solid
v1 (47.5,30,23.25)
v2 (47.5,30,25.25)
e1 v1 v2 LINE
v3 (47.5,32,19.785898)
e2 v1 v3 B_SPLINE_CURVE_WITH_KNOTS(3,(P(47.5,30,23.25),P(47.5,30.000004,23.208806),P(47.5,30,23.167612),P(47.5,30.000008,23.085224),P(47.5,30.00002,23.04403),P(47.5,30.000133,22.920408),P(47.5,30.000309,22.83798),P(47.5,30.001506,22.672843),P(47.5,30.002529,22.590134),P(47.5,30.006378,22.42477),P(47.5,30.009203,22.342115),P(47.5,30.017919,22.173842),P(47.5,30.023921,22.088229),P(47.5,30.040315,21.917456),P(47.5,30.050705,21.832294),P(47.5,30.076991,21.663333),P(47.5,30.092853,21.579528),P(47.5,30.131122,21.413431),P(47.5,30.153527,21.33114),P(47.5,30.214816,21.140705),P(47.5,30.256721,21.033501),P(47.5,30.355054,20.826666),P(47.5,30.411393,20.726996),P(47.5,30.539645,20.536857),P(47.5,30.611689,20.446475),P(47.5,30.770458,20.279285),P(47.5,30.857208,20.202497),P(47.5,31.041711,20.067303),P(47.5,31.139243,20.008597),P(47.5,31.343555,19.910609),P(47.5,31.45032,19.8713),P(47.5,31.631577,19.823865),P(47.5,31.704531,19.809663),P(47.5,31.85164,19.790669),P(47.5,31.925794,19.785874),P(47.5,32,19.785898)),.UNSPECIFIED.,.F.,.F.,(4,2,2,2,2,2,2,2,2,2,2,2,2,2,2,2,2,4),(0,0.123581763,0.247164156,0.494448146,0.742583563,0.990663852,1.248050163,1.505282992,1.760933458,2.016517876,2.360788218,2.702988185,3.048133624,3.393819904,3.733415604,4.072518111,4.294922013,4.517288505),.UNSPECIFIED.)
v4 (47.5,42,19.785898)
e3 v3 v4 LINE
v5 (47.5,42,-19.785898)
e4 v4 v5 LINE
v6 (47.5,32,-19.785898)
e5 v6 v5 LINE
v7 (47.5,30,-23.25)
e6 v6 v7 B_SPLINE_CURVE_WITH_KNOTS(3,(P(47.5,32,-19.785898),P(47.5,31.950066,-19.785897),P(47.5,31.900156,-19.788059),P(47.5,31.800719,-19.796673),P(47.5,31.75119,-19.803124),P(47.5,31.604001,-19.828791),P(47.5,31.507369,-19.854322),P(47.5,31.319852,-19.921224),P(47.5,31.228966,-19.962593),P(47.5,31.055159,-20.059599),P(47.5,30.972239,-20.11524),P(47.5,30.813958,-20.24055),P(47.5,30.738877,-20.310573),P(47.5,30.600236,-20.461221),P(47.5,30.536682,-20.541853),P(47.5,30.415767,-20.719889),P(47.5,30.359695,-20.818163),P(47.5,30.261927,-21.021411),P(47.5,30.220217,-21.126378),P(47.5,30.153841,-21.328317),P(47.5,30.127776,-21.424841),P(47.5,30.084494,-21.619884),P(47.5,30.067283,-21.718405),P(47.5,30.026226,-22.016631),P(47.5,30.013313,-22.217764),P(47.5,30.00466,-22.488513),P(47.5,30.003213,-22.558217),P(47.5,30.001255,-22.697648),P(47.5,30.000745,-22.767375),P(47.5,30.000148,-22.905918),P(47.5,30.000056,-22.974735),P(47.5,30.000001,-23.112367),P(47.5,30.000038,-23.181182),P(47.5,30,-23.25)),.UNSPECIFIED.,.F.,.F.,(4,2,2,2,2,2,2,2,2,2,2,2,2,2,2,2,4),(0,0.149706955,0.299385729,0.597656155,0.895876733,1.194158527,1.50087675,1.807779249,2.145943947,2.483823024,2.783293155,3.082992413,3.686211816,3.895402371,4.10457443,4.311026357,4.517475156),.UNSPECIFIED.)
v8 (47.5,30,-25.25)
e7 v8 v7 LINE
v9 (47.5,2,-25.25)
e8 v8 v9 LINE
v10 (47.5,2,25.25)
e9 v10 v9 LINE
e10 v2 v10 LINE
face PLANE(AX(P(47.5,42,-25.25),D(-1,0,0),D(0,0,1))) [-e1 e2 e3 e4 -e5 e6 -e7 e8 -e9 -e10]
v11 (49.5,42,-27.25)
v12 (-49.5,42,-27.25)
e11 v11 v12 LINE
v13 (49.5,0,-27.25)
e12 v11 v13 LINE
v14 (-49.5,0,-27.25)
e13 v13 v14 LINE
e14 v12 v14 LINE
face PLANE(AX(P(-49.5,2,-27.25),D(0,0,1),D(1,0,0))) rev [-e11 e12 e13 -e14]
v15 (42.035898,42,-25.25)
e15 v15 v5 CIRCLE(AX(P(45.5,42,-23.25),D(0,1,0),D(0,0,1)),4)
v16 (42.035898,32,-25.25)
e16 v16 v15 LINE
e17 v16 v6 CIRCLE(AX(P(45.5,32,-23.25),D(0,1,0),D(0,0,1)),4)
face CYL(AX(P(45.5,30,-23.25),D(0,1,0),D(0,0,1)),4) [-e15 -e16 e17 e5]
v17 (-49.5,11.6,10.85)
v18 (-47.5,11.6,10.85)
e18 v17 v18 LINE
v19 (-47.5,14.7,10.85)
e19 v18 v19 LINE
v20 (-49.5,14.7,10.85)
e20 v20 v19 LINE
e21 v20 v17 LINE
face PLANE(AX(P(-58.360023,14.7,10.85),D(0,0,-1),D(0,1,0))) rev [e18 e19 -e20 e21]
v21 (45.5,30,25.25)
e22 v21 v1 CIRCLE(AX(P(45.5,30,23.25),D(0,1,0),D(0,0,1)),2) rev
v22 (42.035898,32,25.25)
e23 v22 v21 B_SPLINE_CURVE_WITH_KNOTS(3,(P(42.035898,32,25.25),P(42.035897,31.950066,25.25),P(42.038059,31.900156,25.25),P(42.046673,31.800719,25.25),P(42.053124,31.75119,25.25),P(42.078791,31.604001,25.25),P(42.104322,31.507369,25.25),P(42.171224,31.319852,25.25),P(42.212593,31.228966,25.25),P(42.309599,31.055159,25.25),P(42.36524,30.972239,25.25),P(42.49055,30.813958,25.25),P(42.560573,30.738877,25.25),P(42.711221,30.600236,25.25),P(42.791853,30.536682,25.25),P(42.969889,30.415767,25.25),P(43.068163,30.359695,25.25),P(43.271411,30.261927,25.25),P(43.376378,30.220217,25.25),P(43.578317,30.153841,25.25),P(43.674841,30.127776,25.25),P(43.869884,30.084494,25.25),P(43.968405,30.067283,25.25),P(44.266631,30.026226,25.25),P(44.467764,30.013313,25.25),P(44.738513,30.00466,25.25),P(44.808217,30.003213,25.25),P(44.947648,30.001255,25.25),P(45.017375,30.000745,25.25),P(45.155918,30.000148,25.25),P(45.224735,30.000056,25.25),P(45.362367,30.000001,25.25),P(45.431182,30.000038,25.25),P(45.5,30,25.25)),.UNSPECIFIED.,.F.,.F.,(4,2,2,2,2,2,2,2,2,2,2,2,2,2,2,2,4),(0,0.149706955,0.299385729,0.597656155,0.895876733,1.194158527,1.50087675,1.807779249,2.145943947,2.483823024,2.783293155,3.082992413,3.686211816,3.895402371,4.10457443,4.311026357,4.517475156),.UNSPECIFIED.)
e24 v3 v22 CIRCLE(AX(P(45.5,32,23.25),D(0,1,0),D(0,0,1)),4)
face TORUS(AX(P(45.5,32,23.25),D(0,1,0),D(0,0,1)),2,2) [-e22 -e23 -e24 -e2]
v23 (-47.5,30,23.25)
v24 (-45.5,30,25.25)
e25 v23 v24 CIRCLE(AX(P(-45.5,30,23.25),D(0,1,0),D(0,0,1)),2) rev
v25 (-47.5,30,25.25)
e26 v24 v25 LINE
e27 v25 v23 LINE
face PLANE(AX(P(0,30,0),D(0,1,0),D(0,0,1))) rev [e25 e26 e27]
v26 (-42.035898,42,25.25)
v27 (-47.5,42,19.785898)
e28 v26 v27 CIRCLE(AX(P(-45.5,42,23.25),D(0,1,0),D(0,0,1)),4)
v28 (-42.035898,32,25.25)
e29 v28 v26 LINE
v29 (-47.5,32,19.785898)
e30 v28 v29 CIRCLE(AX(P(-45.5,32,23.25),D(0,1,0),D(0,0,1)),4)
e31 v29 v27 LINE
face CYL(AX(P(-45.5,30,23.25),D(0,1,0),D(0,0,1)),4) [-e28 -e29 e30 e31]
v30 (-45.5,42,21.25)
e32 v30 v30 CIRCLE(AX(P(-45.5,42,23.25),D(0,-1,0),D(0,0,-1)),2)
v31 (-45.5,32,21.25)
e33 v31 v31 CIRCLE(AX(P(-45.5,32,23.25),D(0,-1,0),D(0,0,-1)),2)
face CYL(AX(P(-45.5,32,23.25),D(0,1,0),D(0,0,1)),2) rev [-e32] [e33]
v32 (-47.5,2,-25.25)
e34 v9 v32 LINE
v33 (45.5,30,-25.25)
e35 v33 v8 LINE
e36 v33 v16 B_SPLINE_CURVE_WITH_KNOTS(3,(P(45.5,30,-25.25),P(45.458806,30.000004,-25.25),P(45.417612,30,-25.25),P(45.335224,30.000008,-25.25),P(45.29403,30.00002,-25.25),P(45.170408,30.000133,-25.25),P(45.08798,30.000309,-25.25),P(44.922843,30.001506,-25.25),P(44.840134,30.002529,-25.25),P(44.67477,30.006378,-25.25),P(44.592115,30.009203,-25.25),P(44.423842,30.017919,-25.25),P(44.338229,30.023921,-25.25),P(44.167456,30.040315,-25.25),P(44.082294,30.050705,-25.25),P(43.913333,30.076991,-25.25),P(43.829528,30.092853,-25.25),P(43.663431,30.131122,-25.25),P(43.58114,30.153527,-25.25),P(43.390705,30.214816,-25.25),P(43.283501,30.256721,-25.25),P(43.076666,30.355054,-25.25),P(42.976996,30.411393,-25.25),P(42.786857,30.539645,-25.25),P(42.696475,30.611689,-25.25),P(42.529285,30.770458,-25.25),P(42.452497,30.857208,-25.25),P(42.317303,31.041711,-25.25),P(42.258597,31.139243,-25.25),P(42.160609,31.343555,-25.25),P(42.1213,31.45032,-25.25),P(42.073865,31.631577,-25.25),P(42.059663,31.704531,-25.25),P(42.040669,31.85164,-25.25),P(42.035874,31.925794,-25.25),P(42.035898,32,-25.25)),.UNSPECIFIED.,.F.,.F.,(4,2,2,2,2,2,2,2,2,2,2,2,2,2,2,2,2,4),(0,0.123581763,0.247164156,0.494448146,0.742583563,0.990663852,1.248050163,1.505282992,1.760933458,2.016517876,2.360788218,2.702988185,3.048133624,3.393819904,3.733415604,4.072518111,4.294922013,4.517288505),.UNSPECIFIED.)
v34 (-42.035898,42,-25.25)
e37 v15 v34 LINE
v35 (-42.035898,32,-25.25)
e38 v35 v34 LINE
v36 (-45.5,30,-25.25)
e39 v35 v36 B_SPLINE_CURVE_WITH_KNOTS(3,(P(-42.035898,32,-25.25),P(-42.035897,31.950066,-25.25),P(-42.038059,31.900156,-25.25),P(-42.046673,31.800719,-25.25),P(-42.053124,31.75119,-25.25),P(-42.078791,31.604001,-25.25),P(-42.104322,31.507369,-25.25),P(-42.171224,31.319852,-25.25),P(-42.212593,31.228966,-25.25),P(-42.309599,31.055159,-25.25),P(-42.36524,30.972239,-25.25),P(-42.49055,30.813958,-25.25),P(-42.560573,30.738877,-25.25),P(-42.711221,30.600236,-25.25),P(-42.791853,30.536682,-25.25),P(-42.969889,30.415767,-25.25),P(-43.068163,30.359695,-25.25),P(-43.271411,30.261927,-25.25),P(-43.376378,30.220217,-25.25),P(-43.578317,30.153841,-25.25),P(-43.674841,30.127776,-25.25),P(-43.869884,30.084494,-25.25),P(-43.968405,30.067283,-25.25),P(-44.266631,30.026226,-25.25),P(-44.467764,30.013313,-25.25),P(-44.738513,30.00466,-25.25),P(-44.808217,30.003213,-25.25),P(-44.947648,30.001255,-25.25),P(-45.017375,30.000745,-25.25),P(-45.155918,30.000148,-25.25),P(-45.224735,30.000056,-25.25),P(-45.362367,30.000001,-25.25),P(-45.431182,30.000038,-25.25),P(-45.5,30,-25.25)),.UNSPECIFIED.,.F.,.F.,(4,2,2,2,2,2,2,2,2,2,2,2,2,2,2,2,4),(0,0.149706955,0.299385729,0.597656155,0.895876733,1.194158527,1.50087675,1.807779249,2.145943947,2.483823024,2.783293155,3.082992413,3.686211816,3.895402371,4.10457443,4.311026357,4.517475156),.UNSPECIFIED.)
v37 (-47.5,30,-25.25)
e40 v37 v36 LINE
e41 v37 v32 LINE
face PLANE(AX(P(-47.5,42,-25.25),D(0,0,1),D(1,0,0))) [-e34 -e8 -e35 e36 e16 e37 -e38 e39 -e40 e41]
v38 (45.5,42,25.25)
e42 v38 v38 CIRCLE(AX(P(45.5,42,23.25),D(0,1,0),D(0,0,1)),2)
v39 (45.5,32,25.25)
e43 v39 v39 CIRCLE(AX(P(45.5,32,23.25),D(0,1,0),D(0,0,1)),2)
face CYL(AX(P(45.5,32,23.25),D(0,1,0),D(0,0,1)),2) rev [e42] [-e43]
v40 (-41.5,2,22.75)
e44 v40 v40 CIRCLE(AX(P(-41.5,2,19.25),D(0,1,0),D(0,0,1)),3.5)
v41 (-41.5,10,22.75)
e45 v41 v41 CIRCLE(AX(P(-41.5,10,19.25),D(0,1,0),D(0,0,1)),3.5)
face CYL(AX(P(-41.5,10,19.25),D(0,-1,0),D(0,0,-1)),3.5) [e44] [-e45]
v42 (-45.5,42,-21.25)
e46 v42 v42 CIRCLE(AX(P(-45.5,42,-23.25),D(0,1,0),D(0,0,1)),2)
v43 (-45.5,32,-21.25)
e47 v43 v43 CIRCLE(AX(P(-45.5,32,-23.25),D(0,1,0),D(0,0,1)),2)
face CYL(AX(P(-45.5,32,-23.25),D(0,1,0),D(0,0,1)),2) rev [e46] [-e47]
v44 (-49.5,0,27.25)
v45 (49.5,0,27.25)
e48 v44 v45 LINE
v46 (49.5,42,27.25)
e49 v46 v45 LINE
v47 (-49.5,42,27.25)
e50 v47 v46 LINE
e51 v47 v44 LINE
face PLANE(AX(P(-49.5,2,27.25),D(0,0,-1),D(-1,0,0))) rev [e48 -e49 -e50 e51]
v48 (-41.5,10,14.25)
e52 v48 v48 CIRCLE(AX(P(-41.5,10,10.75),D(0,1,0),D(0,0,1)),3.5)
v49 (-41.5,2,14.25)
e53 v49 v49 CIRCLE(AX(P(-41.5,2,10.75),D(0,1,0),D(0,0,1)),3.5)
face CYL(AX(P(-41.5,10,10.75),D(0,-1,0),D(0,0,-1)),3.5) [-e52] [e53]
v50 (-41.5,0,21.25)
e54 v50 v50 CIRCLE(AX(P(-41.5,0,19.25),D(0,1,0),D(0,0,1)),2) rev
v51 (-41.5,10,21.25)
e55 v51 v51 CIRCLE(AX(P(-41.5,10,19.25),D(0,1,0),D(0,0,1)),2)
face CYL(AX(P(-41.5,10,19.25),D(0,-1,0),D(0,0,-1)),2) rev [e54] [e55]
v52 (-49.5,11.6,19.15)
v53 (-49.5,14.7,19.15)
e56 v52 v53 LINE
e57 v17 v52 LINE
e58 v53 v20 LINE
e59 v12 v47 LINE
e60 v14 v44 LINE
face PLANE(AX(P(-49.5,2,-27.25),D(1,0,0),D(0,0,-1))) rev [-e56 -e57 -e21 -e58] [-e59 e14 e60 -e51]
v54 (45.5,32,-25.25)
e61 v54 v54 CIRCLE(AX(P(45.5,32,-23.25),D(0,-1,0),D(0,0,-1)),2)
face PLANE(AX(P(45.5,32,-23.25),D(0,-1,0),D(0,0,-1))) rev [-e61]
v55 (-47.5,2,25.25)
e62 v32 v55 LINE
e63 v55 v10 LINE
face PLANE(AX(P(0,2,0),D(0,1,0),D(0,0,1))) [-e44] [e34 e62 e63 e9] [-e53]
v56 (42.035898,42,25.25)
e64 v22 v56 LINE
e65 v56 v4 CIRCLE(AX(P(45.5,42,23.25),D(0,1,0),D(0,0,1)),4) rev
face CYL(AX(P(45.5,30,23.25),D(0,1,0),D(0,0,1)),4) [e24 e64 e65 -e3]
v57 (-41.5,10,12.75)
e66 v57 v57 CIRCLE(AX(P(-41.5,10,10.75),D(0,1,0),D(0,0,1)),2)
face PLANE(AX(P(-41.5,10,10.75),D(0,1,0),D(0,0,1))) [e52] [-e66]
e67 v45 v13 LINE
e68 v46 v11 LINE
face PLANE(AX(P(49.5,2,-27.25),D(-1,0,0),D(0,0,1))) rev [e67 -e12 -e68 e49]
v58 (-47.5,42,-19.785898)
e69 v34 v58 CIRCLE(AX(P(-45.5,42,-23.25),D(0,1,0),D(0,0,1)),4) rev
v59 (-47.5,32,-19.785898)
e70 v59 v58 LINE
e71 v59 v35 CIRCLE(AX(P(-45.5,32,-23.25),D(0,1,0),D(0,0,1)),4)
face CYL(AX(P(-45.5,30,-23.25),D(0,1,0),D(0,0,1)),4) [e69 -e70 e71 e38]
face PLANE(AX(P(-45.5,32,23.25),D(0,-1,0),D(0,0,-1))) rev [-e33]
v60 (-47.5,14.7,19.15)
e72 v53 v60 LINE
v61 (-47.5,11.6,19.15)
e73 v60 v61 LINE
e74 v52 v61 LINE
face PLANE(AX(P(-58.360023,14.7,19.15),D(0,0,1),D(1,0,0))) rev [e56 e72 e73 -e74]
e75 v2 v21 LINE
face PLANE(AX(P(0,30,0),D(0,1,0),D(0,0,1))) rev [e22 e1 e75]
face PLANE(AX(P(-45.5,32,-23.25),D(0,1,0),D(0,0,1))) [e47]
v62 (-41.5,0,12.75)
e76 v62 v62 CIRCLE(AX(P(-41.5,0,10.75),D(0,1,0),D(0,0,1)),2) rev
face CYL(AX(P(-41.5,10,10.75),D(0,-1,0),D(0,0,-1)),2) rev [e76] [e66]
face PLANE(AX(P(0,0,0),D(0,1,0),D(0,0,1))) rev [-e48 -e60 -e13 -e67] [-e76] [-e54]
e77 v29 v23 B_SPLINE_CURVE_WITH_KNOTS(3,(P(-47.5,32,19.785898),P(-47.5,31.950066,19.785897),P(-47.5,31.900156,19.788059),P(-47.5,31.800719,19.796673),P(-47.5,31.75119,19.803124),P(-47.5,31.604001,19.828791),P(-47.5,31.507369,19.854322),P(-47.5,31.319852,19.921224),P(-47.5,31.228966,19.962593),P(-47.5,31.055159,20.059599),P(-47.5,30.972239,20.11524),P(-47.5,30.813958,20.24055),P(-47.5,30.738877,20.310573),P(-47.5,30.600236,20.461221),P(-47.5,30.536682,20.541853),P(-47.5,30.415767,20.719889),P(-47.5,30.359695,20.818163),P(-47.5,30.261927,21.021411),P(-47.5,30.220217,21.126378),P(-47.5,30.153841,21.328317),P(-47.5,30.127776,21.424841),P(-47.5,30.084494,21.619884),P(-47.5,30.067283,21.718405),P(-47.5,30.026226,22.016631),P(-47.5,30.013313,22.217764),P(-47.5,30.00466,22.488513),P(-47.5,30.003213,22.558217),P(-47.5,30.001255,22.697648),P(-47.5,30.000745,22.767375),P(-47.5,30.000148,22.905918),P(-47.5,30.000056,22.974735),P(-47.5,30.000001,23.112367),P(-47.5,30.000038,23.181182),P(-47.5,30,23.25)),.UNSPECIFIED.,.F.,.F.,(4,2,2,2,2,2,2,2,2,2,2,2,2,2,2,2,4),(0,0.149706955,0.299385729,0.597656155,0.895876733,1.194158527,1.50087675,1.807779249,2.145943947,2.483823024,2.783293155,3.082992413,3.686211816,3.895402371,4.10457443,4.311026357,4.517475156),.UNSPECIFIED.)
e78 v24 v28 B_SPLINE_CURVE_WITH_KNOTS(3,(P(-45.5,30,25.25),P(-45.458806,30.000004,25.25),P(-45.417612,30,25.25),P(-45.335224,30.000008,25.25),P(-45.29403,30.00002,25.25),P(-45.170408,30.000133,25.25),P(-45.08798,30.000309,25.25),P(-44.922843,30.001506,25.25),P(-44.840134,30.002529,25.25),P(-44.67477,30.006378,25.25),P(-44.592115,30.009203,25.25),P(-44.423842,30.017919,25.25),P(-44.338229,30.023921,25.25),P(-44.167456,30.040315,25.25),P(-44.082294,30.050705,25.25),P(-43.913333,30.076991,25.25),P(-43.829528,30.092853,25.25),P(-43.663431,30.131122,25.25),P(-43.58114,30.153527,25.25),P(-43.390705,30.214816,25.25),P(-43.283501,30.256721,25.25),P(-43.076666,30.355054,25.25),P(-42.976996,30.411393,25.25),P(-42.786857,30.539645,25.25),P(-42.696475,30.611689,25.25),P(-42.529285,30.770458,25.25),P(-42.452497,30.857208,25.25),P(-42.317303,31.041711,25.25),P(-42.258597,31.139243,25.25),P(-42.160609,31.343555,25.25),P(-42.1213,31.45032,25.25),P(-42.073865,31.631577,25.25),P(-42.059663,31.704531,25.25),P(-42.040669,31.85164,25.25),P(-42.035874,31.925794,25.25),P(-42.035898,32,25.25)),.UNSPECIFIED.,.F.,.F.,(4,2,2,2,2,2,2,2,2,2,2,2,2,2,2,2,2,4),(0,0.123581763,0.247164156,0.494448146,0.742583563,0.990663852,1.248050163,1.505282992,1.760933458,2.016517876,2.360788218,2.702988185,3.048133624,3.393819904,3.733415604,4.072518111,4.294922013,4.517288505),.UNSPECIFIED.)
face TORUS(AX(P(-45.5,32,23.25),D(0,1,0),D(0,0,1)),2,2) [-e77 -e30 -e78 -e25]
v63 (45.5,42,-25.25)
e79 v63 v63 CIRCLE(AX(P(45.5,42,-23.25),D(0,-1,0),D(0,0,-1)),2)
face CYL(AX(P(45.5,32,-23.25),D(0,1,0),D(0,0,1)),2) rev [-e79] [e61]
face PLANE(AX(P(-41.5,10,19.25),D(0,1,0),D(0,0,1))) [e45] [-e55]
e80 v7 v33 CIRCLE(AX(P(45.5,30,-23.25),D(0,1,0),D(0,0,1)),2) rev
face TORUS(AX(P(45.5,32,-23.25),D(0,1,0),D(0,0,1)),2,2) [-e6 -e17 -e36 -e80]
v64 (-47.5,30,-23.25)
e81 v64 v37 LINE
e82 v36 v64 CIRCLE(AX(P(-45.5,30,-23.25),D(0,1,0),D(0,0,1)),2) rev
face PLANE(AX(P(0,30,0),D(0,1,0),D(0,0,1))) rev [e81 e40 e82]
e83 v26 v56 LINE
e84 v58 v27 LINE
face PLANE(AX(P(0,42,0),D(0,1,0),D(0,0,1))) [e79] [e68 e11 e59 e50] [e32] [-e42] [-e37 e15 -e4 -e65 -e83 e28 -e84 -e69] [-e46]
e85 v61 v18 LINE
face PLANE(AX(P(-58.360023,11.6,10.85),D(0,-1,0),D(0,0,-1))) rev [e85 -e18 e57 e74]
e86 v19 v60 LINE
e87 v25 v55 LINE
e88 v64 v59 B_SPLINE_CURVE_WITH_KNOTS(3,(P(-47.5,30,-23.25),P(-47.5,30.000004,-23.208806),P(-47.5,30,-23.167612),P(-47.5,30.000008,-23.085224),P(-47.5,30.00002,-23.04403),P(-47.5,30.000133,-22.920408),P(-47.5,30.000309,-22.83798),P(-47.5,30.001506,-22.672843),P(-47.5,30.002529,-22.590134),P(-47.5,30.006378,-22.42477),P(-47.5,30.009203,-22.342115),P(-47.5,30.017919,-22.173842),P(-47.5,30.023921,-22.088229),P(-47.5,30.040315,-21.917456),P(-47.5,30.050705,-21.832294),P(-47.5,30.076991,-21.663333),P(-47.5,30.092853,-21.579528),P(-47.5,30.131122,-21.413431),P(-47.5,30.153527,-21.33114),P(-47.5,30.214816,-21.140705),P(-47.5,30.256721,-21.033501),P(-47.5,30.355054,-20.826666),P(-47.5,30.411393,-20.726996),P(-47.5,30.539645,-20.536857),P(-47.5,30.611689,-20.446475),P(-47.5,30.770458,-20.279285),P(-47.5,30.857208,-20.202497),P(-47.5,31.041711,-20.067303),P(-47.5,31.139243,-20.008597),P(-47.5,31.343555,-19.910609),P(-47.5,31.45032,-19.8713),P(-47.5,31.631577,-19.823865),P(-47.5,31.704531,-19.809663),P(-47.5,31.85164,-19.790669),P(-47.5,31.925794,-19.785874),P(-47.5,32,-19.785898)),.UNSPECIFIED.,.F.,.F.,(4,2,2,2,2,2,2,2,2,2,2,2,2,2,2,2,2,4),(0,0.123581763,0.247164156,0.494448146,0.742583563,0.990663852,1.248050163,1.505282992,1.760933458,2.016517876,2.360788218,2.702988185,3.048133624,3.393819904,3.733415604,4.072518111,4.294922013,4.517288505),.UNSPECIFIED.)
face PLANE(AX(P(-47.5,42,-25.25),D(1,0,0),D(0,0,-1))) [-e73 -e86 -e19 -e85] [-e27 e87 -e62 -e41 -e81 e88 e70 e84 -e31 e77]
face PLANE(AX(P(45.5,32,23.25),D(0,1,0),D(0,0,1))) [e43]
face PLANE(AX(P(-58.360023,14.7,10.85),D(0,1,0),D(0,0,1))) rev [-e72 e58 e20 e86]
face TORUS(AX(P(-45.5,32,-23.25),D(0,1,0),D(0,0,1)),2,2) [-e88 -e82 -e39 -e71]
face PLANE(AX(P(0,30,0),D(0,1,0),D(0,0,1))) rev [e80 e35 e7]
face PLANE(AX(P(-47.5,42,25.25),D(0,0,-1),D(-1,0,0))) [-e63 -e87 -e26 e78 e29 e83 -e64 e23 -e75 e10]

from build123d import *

# Parameters (mm, degrees)
SKETCH1_W           = 99
SKETCH1_H           = 54.5
BOSS_EXTRUDE1_DEPTH = 2
SKETCH2_W           = 99
SKETCH2_H           = 54.5
SKETCH2_W_2         = 95
SKETCH2_H_2         = 50.5
BOSS_EXTRUDE2_DEPTH = 40
SKETCH4_R           = 3.5
SKETCH4_R_2         = 2
BOSS_EXTRUDE3_DEPTH = 8
CUT_EXTRUDE1_START  = -2
SKETCH4_2_R         = 2
CUT_EXTRUDE1_DEPTH  = 2
SKETCH6_W           = 8.3
SKETCH6_H           = 3.1
CUT_EXTRUDE2_DEPTH  = 2
BOSS_EXTRUDE4_DEPTH = 12
SKETCH7_4_R         = 2
CUT_EXTRUDE3_DEPTH  = 10
FILLET1_R           = 2


with BuildPart() as part:
    # Sketch1 → Boss-Extrude1 (new body)
    with BuildSketch(Plane(origin=(0, 0, 0), x_dir=(1, 0, 0), z_dir=(0, 1, 0))):
        Rectangle(SKETCH1_W, SKETCH1_H)
    extrude(amount=BOSS_EXTRUDE1_DEPTH)

    # Sketch2 → Boss-Extrude2 (add)
    with BuildSketch(Plane(origin=(0, 2, 0), x_dir=(1, 0, 0), z_dir=(0, 1, 0))):
        Rectangle(SKETCH2_W, SKETCH2_H)
        Rectangle(SKETCH2_W_2, SKETCH2_H_2, mode=Mode.SUBTRACT)
    extrude(amount=BOSS_EXTRUDE2_DEPTH)

    # Sketch4 → Boss-Extrude3 (add)
    # profile 1 of 2: a face of its own
    with BuildSketch(Plane(origin=(0, 2, 0), x_dir=(1, 0, 0), z_dir=(0, 1, 0))):
        with Locations(Location((-41.5, -19.25, 0), (0, 0, 270))):
            Circle(SKETCH4_R)
        with Locations(Location((-41.5, -19.25, 0), (0, 0, 270))):
            Circle(SKETCH4_R_2, mode=Mode.SUBTRACT)
    # profile 2 of 2: a face of its own
    with BuildSketch(Plane(origin=(0, 2, 0), x_dir=(1, 0, 0), z_dir=(0, 1, 0))):
        with Locations(Location((-41.5, -10.75, 0), (0, 0, 270))):
            Circle(SKETCH4_R)
        with Locations(Location((-41.5, -10.75, 0), (0, 0, 270))):
            Circle(SKETCH4_R_2, mode=Mode.SUBTRACT)
    extrude(amount=BOSS_EXTRUDE3_DEPTH)

    # Sketch4<2> → Cut-Extrude1 (cut)
    with BuildSketch(Plane(origin=(0, 2, 0), x_dir=(1, 0, 0), z_dir=(0, 1, 0)).offset(CUT_EXTRUDE1_START)):
        with Locations(Location((-41.5, -10.75, 0), (0, 0, 270))):
            Circle(SKETCH4_2_R)
        with Locations(Location((-41.5, -19.25, 0), (0, 0, 270))):
            Circle(SKETCH4_2_R)
    extrude(amount=CUT_EXTRUDE1_DEPTH, mode=Mode.SUBTRACT)

    # Sketch6 → Cut-Extrude2 (cut)
    with BuildSketch(Plane(origin=(-47.5, 0, 0), x_dir=(0, 0, -1), z_dir=(1, 0, 0))):
        with Locations((-15, 13.15)):
            Rectangle(SKETCH6_W, SKETCH6_H)
    extrude(amount=-CUT_EXTRUDE2_DEPTH, mode=Mode.SUBTRACT)

    # Sketch7 → Boss-Extrude4 (add)
    with BuildSketch(Plane(origin=(0, 42, 0), x_dir=(1, 0, 0), z_dir=(0, 1, 0))):
        with BuildLine():
            ThreePointArc((-47.5, 19.785898385), (-42.671572875, 20.421572875), (-42.035898385, 25.25))
            Line((-42.035898385, 25.25), (-47.5, 25.25))
            Line((-47.5, 25.25), (-47.5, 19.785898385))
        make_face()
        with BuildLine():
            ThreePointArc((42.035898385, 25.25), (42.671572875, 20.421572875), (47.5, 19.785898385))
            Line((47.5, 19.785898385), (47.5, 25.25))
            Line((47.5, 25.25), (42.035898385, 25.25))
        make_face()
        with BuildLine():
            Line((47.5, -25.25), (47.5, -19.785898385))
            ThreePointArc((47.5, -19.785898385), (42.671572875, -20.421572875), (42.035898385, -25.25))
            Line((42.035898385, -25.25), (47.5, -25.25))
        make_face()
        with BuildLine():
            ThreePointArc((-42.035898385, -25.25), (-42.671572875, -20.421572875), (-47.5, -19.785898385))
            Line((-47.5, -19.785898385), (-47.5, -25.25))
            Line((-47.5, -25.25), (-42.035898385, -25.25))
        make_face()
    extrude(amount=-BOSS_EXTRUDE4_DEPTH)

    # Sketch7<4> → Cut-Extrude3 (cut)
    with BuildSketch(Plane(origin=(0, 42, 0), x_dir=(1, 0, 0), z_dir=(0, 1, 0))):
        with Locations(Location((-45.5, 23.25, 0), (0, 0, 270))):
            Circle(SKETCH7_4_R)
        with Locations(Location((45.5, 23.25, 0), (0, 0, 90))):
            Circle(SKETCH7_4_R)
        with Locations(Location((-45.5, -23.25, 0), (0, 0, 90))):
            Circle(SKETCH7_4_R)
        with Locations(Location((45.5, -23.25, 0), (0, 0, 270))):
            Circle(SKETCH7_4_R)
    extrude(amount=-CUT_EXTRUDE3_DEPTH, mode=Mode.SUBTRACT)

    # Fillet1
    fillet1_edges = [part.edges().sort_by_distance(p)[0] for p in [
        (42.671572875, 30, -20.421572875),
        (-42.671572875, 30, 20.421572875),
        (-42.671572875, 30, -20.421572875),
        (42.671572875, 30, 20.421572875),
    ]]
    fillet(fillet1_edges, radius=FILLET1_R - 0.0001)  # a hair under: the kernel refuses the full size


solid = part.part
